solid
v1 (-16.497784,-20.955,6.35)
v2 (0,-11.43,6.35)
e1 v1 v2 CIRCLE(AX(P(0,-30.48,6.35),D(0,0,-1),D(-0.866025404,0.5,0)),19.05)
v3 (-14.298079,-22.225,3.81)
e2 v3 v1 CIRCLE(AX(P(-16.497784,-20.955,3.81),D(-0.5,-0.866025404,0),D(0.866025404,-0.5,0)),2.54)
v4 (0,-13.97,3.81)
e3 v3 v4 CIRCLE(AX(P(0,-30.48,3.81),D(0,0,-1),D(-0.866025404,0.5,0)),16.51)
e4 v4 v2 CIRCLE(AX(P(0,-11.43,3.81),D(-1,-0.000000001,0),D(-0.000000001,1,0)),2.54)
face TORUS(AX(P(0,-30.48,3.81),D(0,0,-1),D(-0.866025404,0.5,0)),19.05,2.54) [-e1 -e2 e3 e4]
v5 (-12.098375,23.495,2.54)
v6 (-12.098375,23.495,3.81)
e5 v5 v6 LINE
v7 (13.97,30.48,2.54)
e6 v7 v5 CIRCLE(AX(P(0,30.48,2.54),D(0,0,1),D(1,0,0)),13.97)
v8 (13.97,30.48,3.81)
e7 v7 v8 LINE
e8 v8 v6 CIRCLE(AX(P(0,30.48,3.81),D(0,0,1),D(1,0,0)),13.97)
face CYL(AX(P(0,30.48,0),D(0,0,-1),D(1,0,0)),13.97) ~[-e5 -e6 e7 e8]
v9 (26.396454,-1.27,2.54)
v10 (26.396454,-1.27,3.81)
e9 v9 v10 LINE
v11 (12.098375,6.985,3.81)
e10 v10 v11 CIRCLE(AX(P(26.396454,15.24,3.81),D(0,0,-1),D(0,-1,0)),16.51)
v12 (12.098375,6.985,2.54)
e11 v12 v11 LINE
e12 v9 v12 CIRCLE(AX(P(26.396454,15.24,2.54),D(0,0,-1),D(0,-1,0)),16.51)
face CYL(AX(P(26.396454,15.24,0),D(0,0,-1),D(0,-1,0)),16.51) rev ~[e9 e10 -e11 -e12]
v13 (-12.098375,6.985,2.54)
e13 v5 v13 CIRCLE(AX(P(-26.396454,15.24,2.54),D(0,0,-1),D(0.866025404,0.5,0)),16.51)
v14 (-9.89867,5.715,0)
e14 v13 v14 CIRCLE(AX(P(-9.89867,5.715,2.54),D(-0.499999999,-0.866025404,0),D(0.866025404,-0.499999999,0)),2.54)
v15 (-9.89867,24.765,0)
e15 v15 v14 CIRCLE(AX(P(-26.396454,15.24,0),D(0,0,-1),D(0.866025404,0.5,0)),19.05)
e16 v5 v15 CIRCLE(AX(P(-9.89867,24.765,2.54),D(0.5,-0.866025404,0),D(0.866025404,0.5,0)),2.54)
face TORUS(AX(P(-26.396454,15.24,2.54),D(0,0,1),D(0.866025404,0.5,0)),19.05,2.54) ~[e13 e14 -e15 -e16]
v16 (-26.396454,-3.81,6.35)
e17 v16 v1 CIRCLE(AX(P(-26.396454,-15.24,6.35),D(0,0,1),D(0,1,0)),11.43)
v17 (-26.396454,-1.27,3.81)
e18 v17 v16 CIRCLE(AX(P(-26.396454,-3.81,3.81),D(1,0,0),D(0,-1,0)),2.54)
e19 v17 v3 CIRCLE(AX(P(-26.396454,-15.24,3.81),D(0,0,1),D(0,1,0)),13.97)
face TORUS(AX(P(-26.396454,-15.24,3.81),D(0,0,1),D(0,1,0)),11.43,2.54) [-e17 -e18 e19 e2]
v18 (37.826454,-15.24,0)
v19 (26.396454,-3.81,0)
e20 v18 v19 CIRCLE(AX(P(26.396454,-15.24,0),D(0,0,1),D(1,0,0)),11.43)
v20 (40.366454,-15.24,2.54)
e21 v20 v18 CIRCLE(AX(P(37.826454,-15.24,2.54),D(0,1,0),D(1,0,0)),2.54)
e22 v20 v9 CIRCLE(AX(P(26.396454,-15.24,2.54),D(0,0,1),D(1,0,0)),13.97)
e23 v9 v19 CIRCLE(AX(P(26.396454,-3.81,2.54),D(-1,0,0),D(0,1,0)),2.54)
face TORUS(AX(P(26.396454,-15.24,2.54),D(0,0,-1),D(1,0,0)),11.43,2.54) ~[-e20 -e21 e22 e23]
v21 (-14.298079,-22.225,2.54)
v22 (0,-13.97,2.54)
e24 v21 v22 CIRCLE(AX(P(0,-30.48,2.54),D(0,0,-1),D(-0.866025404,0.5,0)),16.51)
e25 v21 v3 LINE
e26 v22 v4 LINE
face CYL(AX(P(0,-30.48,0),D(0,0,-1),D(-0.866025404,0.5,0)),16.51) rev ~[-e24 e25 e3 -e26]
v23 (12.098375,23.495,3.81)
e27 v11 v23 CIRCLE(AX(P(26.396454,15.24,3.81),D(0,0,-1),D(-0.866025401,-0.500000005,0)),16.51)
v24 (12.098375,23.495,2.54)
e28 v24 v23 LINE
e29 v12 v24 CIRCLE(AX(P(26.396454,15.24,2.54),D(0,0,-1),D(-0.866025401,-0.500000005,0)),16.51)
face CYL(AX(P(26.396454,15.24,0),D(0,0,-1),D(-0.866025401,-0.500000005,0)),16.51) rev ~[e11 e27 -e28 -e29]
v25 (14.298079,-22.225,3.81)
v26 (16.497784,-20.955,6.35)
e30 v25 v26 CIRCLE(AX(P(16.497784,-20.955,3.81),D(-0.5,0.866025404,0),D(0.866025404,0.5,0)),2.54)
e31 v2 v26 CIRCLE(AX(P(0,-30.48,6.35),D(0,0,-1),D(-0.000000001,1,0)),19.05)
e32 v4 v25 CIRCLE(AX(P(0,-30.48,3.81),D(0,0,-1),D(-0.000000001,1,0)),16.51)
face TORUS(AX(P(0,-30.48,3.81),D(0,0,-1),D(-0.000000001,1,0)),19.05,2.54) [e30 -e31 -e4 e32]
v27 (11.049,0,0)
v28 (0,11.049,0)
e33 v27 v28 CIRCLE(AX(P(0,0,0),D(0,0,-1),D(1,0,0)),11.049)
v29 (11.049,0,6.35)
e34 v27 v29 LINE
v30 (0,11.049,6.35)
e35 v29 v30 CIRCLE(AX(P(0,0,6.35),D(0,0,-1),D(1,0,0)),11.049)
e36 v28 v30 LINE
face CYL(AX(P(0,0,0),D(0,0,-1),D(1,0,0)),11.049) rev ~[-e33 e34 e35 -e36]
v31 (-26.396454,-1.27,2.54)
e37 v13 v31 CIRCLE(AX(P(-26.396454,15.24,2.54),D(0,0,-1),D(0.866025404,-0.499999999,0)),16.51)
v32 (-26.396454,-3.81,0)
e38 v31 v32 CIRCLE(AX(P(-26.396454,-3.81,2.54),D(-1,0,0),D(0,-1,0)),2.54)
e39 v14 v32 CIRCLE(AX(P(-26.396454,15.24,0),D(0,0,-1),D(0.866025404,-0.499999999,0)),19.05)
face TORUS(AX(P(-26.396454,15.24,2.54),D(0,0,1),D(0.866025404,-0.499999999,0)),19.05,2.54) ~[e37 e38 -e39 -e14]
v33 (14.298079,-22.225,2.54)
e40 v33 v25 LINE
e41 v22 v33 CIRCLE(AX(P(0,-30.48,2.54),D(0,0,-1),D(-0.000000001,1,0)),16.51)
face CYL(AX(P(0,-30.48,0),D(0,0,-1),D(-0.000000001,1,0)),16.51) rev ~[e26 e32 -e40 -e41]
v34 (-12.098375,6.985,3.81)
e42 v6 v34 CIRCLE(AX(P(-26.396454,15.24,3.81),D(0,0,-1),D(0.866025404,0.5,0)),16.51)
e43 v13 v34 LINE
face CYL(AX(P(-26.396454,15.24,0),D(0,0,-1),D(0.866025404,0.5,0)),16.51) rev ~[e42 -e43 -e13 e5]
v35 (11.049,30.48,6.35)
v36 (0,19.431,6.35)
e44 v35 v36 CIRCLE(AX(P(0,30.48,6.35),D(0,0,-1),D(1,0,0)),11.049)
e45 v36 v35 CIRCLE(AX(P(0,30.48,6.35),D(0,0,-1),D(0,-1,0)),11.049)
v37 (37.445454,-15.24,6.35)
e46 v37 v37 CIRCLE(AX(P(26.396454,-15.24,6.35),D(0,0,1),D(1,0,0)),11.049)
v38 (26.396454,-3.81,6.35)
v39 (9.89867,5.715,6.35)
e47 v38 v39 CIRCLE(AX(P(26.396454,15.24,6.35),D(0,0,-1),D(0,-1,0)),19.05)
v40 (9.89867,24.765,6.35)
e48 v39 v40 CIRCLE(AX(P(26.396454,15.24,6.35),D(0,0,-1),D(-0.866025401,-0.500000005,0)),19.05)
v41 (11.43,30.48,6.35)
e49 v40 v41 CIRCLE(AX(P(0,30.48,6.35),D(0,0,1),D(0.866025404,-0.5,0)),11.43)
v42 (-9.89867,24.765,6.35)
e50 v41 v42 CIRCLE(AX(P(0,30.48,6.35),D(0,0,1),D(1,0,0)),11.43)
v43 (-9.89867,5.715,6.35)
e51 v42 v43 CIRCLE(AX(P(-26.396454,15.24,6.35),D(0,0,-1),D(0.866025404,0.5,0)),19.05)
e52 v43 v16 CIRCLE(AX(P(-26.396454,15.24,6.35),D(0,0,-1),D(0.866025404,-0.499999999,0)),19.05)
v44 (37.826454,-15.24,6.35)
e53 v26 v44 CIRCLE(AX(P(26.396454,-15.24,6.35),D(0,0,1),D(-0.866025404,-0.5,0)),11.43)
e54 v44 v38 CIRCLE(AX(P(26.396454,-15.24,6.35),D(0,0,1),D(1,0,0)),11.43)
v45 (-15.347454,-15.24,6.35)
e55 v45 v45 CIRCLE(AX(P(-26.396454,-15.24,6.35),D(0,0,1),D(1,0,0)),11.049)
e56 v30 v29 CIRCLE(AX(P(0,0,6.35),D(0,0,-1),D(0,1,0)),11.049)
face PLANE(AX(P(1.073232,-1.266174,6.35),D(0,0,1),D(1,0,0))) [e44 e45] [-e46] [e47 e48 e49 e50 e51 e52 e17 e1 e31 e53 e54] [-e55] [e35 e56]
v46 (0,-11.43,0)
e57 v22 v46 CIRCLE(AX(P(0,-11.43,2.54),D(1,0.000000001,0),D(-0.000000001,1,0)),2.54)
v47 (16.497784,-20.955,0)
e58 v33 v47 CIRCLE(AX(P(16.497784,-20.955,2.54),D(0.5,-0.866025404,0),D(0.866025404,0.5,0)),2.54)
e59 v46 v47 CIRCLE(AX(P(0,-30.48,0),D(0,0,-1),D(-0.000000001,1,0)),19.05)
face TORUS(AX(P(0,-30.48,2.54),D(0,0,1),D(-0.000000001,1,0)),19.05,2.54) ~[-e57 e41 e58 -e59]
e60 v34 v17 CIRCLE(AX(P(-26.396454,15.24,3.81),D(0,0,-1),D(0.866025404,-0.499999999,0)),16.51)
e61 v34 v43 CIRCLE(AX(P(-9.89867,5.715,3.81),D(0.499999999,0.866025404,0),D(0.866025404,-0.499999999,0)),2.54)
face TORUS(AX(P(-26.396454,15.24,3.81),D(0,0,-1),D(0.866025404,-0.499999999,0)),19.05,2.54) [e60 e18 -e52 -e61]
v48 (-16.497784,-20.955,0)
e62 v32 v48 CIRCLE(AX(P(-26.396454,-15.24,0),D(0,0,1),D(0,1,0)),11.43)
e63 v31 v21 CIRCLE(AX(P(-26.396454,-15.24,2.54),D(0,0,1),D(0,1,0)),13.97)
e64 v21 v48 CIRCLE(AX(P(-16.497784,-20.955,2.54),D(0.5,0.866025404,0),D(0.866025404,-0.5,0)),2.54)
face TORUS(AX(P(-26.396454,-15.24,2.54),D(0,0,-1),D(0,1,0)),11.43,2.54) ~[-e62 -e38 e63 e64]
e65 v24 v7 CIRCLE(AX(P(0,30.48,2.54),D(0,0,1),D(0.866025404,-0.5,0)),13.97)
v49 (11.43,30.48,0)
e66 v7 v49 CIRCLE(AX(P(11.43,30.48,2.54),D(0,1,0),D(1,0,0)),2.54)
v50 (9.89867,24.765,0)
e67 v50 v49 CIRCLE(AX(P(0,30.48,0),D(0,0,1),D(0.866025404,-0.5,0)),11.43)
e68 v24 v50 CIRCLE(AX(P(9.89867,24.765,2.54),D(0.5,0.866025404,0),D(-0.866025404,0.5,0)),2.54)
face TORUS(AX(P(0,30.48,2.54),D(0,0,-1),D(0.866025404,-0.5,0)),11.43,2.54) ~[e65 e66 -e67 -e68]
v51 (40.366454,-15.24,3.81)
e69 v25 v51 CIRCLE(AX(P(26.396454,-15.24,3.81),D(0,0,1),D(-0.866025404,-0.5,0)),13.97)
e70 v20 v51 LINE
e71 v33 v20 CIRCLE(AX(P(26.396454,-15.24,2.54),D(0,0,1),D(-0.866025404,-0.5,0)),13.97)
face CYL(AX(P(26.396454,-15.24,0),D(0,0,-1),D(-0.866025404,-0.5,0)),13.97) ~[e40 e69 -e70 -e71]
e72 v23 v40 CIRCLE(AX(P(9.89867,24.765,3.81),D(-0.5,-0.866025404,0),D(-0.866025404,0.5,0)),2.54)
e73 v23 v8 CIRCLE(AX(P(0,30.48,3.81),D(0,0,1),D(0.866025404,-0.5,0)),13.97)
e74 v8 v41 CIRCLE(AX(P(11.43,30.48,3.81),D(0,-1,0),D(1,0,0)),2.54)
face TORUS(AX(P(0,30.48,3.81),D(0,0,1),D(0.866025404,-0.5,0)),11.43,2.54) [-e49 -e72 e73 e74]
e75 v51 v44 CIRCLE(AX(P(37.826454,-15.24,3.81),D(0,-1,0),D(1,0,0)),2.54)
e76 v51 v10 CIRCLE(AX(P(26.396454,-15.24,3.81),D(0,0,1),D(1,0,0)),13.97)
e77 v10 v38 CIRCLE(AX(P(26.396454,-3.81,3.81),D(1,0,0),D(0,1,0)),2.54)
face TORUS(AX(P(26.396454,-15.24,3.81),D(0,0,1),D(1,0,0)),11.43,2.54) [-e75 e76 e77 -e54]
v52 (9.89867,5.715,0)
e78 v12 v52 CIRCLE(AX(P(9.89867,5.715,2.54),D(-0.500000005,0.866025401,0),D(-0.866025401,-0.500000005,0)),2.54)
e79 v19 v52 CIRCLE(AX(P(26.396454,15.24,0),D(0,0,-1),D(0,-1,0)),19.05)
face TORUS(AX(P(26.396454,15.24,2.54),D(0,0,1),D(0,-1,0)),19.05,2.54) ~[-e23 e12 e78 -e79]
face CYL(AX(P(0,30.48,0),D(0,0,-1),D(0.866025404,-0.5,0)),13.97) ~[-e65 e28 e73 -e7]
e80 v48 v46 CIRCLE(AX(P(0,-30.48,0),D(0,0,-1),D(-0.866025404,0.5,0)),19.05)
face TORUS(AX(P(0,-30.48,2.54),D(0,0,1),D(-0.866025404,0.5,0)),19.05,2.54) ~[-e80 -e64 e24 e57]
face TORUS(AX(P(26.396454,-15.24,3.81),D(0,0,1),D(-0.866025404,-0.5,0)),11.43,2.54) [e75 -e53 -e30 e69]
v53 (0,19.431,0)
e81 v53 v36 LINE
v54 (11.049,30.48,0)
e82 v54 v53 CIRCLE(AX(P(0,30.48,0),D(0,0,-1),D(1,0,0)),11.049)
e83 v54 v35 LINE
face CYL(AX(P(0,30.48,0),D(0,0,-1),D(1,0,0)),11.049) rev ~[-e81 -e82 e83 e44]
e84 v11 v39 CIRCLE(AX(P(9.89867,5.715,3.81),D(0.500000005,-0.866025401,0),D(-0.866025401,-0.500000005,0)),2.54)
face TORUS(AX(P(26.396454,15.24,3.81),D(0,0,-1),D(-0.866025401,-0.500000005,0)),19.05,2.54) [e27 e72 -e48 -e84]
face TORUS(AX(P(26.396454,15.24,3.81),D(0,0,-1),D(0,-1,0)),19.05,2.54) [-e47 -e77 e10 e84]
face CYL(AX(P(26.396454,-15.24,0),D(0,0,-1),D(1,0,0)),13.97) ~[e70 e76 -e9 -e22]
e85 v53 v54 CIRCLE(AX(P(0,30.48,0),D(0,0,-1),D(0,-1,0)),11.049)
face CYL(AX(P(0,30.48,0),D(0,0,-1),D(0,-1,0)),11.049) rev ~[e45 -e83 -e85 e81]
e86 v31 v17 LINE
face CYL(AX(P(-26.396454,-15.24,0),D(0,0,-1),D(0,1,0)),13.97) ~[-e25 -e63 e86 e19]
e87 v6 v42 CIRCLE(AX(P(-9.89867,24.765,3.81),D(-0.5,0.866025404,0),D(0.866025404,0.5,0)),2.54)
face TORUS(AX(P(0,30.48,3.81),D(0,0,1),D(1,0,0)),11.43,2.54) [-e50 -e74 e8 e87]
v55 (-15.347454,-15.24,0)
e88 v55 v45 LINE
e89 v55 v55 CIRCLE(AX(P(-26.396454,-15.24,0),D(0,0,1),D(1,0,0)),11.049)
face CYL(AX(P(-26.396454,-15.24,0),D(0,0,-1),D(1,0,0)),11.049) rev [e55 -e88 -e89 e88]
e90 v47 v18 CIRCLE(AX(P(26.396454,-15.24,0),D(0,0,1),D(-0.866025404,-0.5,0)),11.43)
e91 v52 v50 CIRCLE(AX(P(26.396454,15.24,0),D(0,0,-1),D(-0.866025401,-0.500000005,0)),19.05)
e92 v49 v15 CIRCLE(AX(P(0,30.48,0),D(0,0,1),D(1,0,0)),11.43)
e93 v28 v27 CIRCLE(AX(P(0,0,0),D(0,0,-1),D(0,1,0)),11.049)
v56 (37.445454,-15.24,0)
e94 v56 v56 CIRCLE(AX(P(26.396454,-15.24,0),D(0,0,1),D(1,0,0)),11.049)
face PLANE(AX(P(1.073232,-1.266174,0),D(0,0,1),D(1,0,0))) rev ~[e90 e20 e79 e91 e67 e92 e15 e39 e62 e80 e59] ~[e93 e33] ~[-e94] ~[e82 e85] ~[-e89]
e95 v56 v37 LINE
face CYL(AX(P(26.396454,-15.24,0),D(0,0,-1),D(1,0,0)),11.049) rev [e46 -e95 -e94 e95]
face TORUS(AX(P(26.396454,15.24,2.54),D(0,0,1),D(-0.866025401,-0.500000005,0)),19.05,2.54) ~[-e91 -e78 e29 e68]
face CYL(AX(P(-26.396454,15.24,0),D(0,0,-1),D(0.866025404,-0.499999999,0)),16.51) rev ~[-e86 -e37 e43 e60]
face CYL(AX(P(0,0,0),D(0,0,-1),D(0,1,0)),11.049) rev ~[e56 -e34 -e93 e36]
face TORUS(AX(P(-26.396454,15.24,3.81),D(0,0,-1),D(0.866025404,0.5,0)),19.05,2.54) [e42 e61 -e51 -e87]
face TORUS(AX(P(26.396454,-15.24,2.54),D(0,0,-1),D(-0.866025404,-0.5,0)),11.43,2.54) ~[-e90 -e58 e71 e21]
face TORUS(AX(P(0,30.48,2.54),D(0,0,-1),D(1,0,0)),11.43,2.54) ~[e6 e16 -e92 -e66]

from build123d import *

# Parameters (mm, degrees)
F0_R     = 11.049
F1_DEPTH = 6.35
F2_R     = 2.54


with BuildPart() as f1:
    # F0 (on Top) → F1 (new body)
    with BuildSketch(Plane.XY):
        with BuildLine():
            ThreePointArc((0, 11.049), (7.8128228253, 7.8128228253), (11.049, 0))
            ThreePointArc((11.049, 0), (-2.8596916293, -10.6725144547), (-9.5687146864, 5.5245))
            Line((-9.5687146864, 5.5245), (-12.0983748909, 6.985))
            ThreePointArc((-12.0983748842, 6.9850000115), (-12.0983748972, -6.9849999891), (-1.19e-08, -13.97))
            ThreePointArc((-1.19e-08, -13.97), (9.878281729, -9.8782817374), (13.97, 0))
            ThreePointArc((13.97, 0), (13.4939838051, 3.615702016), (12.0983749365, 6.984999921))
            ThreePointArc((12.0983749365, 6.984999921), (6.9850000395, 12.0983748681), (0, 13.97))
            Line((0, 13.97), (0, 11.049))
        make_face()
        with BuildLine():
            ThreePointArc((-9.5687146864, 5.5245), (-5.5245, 9.5687146864), (0, 11.049))
            Line((0, 11.049), (0, 13.97))
            ThreePointArc((0, 13.97), (-6.9849999943, 12.0983748942), (-12.0983748842, 6.9850000115))
            Line((-12.0983748909, 6.985), (-9.5687146864, 5.5245))
        make_face()
        with BuildLine():
            Line((0, 16.51), (0, 13.97))
            ThreePointArc((0, 13.97), (6.9850000395, 12.0983748681), (12.0983749365, 6.984999921))
            ThreePointArc((12.0983749365, 6.984999921), (9.8864543073, 15.2399999544), (12.0983748909, 23.495))
            ThreePointArc((12.0983748909, 23.495), (6.985, 18.3816251091), (0, 16.51))
        make_face()
        with BuildLine():
            ThreePointArc((-12.0983748842, 6.9850000115), (-6.9849999943, 12.0983748942), (0, 13.97))
            Line((0, 13.97), (0, 16.51))
            ThreePointArc((0, 16.51), (-6.985, 18.3816251091), (-12.0983748909, 23.495))
            ThreePointArc((-12.0983748909, 23.495), (-9.8864543073, 15.2400000066), (-12.0983748842, 6.9850000115))
        make_face()
        with BuildLine():
            ThreePointArc((-1.19e-08, -13.97), (-12.0983748972, -6.9849999891), (-12.0983748842, 6.9850000115))
            ThreePointArc((-12.0983748842, 6.9850000115), (-18.1414543016, 0.9419205868), (-26.3964543073, -1.27))
            ThreePointArc((-26.3964543073, -1.27), (-16.5181725742, -5.3617182668), (-12.4264543073, -15.24))
            ThreePointArc((-12.4264543073, -15.24), (-12.9024705141, -18.8557020601), (-14.2980794165, -22.225))
            ThreePointArc((-14.2980794165, -22.225), (-8.2550000052, -16.1819205865), (-1.19e-08, -13.97))
        make_face()
        with BuildLine():
            ThreePointArc((26.3964543073, -1.27), (18.1414543468, 0.9419205607), (12.0983749365, 6.984999921))
            ThreePointArc((12.0983749365, 6.984999921), (13.4939838051, 3.615702016), (13.97, 0))
            ThreePointArc((13.97, 0), (9.878281729, -9.8782817374), (-1.19e-08, -13.97))
            ThreePointArc((-1.19e-08, -13.97), (8.2549999948, -16.1819205805), (14.2980794165, -22.225))
            ThreePointArc((14.2980794165, -22.225), (14.2980794165, -8.255), (26.3964543073, -1.27))
        make_face()
        with BuildLine():
            ThreePointArc((-12.0983748909, 23.495), (-6.985, 18.3816251091), (0, 16.51))
            ThreePointArc((0, 16.51), (6.985, 18.3816251091), (12.0983748909, 23.495))
            ThreePointArc((12.0983748909, 23.495), (13.4939837933, 26.8642979399), (13.97, 30.48))
            ThreePointArc((13.97, 30.48), (-3.6157020601, 43.9739837933), (-12.0983748909, 23.495))
        make_face()
        with BuildLine():
            ThreePointArc((11.049, 30.48), (7.8128228253, 22.6671771747), (0, 19.431))
            ThreePointArc((0, 19.431), (-7.8128228253, 38.2928228253), (11.049, 30.48))
        make_face(mode=Mode.SUBTRACT)
        with BuildLine():
            ThreePointArc((-12.4264543073, -15.24), (-16.5181725742, -5.3617182668), (-26.3964543073, -1.27))
            ThreePointArc((-26.3964543073, -1.27), (-38.4948291982, -22.225), (-14.2980794165, -22.225))
            ThreePointArc((-14.2980794165, -22.225), (-12.9024705141, -18.8557020601), (-12.4264543073, -15.24))
        make_face()
        with Locations((-26.3964543073, -15.24)):
            Circle(F0_R, mode=Mode.SUBTRACT)
        with BuildLine():
            ThreePointArc((40.3664543073, -15.24), (36.2747360405, -5.3617182668), (26.3964543073, -1.27))
            ThreePointArc((26.3964543073, -1.27), (14.2980794165, -8.255), (14.2980794165, -22.225))
            ThreePointArc((14.2980794165, -22.225), (30.0121563674, -28.7339837933), (40.3664543073, -15.24))
        make_face()
        with Locations((26.3964543073, -15.24)):
            Circle(F0_R, mode=Mode.SUBTRACT)
    extrude(amount=F1_DEPTH)

    # F2
    f2_edges = [f1.edges().sort_by_distance(p)[0] for p in [
        (0, -13.97, 6.35),
        (0, -13.97, 0),
        (-12.098375, 6.985, 0),
        (-12.098375, 6.985, 6.35),
        (-38.494829, -22.225, 0),
        (-38.494829, -22.225, 6.35),
        (38.494829, -22.225, 0),
        (38.494829, -22.225, 6.35),
        (12.098375, 6.985, 0),
        (12.098375, 6.985, 6.35),
        (0, 44.45, 0),
        (0, 44.45, 6.35),
    ]]
    fillet(f2_edges, radius=F2_R)


solid = f1.part
